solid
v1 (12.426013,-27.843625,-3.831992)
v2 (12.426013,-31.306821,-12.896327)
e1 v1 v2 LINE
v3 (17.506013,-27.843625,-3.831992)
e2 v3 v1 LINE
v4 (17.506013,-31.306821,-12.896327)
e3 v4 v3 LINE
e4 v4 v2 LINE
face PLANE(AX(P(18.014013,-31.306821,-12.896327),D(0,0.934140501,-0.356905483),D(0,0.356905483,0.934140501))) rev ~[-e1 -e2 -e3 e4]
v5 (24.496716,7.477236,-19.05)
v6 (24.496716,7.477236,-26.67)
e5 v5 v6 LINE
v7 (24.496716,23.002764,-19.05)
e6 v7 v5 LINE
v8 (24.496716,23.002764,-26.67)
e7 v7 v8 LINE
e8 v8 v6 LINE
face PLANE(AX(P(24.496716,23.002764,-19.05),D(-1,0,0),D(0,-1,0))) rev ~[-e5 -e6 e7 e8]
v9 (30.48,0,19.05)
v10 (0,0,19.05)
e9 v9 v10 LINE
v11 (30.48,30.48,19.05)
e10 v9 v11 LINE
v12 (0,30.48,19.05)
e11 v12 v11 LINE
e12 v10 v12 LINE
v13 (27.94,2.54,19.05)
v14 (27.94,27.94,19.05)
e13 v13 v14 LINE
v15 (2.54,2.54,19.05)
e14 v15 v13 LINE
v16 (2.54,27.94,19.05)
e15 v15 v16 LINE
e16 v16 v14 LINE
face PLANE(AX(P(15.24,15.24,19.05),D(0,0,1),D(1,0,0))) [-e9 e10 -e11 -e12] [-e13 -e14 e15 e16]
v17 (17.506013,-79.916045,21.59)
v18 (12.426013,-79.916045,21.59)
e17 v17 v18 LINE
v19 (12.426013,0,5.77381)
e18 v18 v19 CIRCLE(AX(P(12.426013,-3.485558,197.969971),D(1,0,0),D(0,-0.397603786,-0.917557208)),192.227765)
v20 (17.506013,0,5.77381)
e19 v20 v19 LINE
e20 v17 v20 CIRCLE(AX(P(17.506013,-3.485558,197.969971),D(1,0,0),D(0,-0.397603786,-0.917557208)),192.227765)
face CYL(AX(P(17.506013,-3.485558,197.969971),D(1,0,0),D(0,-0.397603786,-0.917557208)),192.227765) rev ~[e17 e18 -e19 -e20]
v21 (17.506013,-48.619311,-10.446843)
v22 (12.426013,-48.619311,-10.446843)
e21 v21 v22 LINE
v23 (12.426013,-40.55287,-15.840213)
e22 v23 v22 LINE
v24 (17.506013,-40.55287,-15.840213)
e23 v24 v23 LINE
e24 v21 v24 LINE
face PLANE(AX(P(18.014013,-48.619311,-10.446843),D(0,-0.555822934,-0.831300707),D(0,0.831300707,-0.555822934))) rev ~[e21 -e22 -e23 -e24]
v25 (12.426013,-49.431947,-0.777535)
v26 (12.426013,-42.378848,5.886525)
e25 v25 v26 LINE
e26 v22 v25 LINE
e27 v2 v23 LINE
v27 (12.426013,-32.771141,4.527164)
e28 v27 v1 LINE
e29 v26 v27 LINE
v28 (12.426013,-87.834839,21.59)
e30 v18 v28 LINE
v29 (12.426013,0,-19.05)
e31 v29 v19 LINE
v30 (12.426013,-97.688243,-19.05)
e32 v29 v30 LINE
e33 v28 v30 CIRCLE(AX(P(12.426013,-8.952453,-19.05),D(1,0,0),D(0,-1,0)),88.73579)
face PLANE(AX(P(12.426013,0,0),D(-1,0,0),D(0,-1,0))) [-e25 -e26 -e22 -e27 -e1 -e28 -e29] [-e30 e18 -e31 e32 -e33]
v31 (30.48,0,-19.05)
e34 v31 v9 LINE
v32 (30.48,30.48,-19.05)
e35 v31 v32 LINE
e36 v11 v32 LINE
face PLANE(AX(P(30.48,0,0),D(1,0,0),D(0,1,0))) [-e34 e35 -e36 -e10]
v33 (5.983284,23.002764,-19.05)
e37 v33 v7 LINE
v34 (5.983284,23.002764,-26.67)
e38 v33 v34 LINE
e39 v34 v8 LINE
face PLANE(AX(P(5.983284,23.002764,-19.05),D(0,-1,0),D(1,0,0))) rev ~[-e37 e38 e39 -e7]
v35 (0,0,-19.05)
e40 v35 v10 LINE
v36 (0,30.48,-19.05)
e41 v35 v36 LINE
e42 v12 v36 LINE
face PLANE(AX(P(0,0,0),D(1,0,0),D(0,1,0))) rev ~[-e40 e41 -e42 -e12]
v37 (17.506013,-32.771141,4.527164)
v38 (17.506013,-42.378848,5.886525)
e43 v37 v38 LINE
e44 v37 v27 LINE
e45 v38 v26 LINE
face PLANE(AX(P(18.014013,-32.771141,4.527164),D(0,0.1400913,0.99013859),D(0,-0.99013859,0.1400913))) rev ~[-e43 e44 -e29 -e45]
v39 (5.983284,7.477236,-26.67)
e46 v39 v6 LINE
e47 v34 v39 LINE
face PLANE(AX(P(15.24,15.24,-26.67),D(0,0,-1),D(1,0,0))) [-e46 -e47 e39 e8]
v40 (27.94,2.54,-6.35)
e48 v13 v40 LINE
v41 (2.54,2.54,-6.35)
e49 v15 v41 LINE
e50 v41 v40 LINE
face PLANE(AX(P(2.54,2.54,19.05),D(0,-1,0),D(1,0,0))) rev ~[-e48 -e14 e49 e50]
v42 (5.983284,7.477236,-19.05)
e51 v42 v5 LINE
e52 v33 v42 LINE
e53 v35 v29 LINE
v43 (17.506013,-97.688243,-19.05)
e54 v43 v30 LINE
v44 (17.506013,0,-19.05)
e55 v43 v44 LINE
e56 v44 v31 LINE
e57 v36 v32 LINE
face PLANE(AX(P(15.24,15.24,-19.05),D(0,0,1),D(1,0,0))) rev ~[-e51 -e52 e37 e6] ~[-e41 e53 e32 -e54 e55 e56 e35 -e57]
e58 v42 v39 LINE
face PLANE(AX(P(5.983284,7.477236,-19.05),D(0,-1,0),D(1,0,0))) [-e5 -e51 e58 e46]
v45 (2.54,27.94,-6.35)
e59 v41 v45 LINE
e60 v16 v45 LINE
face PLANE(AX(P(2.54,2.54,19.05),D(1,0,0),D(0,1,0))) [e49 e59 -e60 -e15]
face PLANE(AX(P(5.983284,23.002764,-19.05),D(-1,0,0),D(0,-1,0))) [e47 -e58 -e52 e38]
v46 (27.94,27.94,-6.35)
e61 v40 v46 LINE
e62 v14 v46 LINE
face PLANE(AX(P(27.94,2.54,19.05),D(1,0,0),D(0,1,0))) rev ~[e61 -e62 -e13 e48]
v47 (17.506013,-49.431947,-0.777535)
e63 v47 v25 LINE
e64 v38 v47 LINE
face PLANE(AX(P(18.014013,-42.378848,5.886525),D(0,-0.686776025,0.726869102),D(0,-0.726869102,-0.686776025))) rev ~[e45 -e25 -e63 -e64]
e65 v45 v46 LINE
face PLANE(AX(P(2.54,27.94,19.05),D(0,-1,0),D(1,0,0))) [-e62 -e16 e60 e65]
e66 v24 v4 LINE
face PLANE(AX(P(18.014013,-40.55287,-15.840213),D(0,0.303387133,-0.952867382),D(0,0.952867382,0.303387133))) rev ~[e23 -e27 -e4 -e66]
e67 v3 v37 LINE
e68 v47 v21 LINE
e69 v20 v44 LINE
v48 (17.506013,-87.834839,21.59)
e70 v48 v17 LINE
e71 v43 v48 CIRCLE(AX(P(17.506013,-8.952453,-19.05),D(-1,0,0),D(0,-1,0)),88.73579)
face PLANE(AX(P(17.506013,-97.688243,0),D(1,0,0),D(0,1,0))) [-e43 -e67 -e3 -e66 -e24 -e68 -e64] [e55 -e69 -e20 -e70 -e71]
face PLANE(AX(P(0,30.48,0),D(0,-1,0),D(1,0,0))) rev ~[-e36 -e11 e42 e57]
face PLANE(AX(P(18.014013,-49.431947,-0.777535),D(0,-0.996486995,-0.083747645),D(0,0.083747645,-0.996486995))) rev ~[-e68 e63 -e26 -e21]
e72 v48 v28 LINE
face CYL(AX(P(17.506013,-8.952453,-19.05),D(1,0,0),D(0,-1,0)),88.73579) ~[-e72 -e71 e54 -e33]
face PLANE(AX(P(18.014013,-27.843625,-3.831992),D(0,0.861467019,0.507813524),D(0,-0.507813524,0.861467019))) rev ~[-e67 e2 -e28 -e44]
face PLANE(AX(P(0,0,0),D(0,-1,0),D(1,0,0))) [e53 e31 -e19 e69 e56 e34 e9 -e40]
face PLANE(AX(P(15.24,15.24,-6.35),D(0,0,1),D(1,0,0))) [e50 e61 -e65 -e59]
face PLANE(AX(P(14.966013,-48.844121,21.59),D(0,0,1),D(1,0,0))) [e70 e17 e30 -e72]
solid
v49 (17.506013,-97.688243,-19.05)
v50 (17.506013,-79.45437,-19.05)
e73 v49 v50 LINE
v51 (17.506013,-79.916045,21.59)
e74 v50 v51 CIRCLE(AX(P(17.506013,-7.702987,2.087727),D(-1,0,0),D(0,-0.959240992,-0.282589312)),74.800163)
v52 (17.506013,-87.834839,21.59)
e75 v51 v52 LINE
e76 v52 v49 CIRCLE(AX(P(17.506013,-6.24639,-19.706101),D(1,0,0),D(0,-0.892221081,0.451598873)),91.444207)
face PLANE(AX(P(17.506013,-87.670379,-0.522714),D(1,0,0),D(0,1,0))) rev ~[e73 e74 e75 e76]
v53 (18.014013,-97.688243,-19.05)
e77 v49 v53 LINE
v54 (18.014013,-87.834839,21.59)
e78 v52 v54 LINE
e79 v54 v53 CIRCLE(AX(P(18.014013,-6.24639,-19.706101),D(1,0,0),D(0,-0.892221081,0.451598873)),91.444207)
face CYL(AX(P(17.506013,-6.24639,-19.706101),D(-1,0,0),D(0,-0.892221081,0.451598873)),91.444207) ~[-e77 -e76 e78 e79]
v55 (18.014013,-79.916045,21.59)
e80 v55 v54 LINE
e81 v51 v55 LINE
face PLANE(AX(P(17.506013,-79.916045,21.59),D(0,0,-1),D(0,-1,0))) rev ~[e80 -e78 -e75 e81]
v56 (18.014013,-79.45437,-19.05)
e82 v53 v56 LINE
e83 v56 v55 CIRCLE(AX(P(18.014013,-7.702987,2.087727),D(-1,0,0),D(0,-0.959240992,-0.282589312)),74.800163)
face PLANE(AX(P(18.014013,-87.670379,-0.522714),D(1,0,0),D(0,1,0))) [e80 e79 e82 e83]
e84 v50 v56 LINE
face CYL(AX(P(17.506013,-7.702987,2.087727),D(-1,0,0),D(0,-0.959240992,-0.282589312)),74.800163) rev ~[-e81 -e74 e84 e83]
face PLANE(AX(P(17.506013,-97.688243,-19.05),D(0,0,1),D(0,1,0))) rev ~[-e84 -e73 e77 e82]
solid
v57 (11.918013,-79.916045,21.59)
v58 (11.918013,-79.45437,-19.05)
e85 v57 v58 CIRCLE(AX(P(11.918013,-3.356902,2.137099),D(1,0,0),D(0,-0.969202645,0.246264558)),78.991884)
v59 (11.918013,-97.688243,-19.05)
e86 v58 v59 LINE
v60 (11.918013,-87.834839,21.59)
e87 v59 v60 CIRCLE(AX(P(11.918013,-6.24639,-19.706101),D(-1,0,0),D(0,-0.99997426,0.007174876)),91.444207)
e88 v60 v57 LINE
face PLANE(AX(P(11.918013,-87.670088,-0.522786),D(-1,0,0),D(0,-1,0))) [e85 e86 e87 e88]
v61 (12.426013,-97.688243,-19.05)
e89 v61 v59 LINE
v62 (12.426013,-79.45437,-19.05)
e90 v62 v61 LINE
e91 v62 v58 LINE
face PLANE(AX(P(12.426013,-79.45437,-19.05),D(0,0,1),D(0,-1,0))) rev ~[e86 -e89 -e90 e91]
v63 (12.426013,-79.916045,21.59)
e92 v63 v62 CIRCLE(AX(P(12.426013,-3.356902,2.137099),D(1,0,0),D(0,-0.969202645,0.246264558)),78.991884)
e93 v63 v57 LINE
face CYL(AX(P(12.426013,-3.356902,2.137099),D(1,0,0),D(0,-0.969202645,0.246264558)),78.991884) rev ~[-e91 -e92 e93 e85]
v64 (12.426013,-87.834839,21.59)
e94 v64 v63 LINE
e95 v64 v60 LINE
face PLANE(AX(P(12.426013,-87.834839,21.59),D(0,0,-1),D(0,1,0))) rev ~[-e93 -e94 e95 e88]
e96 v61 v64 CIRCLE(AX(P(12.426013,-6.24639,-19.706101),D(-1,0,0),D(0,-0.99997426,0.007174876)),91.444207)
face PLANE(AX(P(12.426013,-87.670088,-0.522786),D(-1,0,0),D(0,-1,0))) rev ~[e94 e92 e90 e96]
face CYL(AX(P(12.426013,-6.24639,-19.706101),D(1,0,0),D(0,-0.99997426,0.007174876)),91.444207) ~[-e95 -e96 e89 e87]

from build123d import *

# Parameters (mm, degrees)
F0_W      = 30.48
F0_H      = 30.48
F1_DEPTH  = 19.05
F2_W      = 18.5134310317
F2_H      = 15.5255280393
F3_DEPTH  = 7.62
F5_DEPTH  = 21.59
F6_W      = 97.6882427931
F6_H      = 2.54
F7_DEPTH  = 25.4
F9_DEPTH  = 25.4
F11_DEPTH = 0.508
F13_DEPTH = 0.508
F15_DEPTH = 25.4
F16_W     = 25.4
F16_H     = 25.4
F17_DEPTH = 25.4


with BuildPart() as f1:
    # F0 (on Top) → F1 (new body, symmetric)
    with BuildSketch(Plane.XY):
        with Locations((15.24, 15.24)):
            Rectangle(F0_W, F0_H)
    extrude(amount=F1_DEPTH, both=True)

    # F2 (on face) → F3 (join)
    with BuildSketch(Plane(origin=(0, 0, -19.05), x_dir=(1, 0, 0), z_dir=(0, 0, -1))):
        with Locations((15.24, -15.24)):
            Rectangle(F2_W, F2_H)
    extrude(amount=F3_DEPTH)

    # F4 (on Top) → F5 (join, symmetric)
    with BuildSketch(Plane.XY):
        Polygon((17.506013127, 0), (12.426013127, 0), (12.426013127, -97.6882427931), (14.966013127, -97.6882427931), (17.506013127, -97.6882427931), align=None)
    extrude(amount=F5_DEPTH, both=True)

    # F6 (on face) → F7 (cut)
    with BuildSketch(Plane.YZ.offset(17.506013127)):
        with BuildLine():
            ThreePointArc((-79.9160450697, 21.59), (-40.8055075971, 9.3997324049), (0, 5.7738097385))
            Line((0, 5.7738097385), (0, 9.3484056997))
            Line((0, 9.3484056997), (0, 19.05))
            Line((0, 19.05), (0, 21.59))
            Line((0, 21.59), (-67.3900023103, 21.59))
            Line((-67.3900023103, 21.59), (-79.9160450697, 21.59))
        make_face()
        with Locations((-48.8441213965, -20.32)):
            Rectangle(F6_W, F6_H)
    extrude(amount=-F7_DEPTH, mode=Mode.SUBTRACT)

    # F8 (on face) → F9 (cut)
    with BuildSketch(Plane.YZ.offset(17.506013127)):
        with BuildLine():
            ThreePointArc((-97.6882427931, -19.05), (-95.1897163869, 1.8587252761), (-87.8348387778, 21.59))
            Line((-87.8348387778, 21.59), (-97.6882427931, 21.59))
            Line((-97.6882427931, 21.59), (-97.6882427931, -19.05))
        make_face()
    extrude(amount=-F9_DEPTH, mode=Mode.SUBTRACT)

    # F14 (on face) → F15 (cut)
    with BuildSketch(Plane.YZ.offset(18.014013127)):
        Polygon((-31.3068207463, -12.8963272836), (-27.8436254601, -3.8319919441), (-32.7711412533, 4.5271638053), (-42.3788482306, 5.8865251898), (-49.4319470766, -0.7775346392), (-48.6193105033, -10.4468427083), (-40.5528704251, -15.8402128236), align=None)
    extrude(amount=-F15_DEPTH, mode=Mode.SUBTRACT)

    # F16 (on face) → F17 (cut)
    with BuildSketch(Plane.XY.offset(19.05)):
        with Locations((15.24, 15.24)):
            Rectangle(F16_W, F16_H)
    extrude(amount=-F17_DEPTH, mode=Mode.SUBTRACT)


with BuildPart() as f11:
    # F10 (on face) → F11 (new body)
    with BuildSketch(Plane.YZ.offset(17.506013127)):
        with BuildLine():
            ThreePointArc((-79.454369843, -19.05), (-82.4983241821, 1.2380426599), (-79.9160450697, 21.59))
            Line((-79.9160450697, 21.59), (-87.8348387778, 21.59))
            ThreePointArc((-87.8348387778, 21.59), (-95.1158094508, 1.8408061102), (-97.6882427931, -19.05))
            Line((-97.6882427931, -19.05), (-79.454369843, -19.05))
        make_face()
    extrude(amount=F11_DEPTH)


with BuildPart() as f13:
    # F12 (on face) → F13 (new body)
    with BuildSketch(Plane(origin=(12.426013127, 0, 0), x_dir=(0, -1, 0), z_dir=(-1, 0, 0))):
        with BuildLine():
            Line((87.8348387778, 21.59), (79.9160450697, 21.59))
            ThreePointArc((79.9160450697, 21.59), (82.4983241821, 1.2380426599), (79.454369843, -19.05))
            Line((79.454369843, -19.05), (97.6882427931, -19.05))
            ThreePointArc((97.6882427931, -19.05), (95.1146199968, 1.8405177202), (87.8348387778, 21.59))
        make_face()
        with BuildLine():
            ThreePointArc((79.454369843, -19.05), (82.4983241821, 1.2380426599), (79.9160450697, 21.59))
            ThreePointArc((79.9160450697, 21.59), (82.3436895998, 1.2397993271), (79.454369843, -19.05))
        make_face()
        with BuildLine():
            ThreePointArc((97.6882427931, -19.05), (95.1158094508, 1.8408061102), (87.8348387778, 21.59))
            ThreePointArc((87.8348387778, 21.59), (95.1146199968, 1.8405177202), (97.6882427931, -19.05))
        make_face()
    extrude(amount=F13_DEPTH)


solid = Compound([f1.part, f11.part, f13.part])
